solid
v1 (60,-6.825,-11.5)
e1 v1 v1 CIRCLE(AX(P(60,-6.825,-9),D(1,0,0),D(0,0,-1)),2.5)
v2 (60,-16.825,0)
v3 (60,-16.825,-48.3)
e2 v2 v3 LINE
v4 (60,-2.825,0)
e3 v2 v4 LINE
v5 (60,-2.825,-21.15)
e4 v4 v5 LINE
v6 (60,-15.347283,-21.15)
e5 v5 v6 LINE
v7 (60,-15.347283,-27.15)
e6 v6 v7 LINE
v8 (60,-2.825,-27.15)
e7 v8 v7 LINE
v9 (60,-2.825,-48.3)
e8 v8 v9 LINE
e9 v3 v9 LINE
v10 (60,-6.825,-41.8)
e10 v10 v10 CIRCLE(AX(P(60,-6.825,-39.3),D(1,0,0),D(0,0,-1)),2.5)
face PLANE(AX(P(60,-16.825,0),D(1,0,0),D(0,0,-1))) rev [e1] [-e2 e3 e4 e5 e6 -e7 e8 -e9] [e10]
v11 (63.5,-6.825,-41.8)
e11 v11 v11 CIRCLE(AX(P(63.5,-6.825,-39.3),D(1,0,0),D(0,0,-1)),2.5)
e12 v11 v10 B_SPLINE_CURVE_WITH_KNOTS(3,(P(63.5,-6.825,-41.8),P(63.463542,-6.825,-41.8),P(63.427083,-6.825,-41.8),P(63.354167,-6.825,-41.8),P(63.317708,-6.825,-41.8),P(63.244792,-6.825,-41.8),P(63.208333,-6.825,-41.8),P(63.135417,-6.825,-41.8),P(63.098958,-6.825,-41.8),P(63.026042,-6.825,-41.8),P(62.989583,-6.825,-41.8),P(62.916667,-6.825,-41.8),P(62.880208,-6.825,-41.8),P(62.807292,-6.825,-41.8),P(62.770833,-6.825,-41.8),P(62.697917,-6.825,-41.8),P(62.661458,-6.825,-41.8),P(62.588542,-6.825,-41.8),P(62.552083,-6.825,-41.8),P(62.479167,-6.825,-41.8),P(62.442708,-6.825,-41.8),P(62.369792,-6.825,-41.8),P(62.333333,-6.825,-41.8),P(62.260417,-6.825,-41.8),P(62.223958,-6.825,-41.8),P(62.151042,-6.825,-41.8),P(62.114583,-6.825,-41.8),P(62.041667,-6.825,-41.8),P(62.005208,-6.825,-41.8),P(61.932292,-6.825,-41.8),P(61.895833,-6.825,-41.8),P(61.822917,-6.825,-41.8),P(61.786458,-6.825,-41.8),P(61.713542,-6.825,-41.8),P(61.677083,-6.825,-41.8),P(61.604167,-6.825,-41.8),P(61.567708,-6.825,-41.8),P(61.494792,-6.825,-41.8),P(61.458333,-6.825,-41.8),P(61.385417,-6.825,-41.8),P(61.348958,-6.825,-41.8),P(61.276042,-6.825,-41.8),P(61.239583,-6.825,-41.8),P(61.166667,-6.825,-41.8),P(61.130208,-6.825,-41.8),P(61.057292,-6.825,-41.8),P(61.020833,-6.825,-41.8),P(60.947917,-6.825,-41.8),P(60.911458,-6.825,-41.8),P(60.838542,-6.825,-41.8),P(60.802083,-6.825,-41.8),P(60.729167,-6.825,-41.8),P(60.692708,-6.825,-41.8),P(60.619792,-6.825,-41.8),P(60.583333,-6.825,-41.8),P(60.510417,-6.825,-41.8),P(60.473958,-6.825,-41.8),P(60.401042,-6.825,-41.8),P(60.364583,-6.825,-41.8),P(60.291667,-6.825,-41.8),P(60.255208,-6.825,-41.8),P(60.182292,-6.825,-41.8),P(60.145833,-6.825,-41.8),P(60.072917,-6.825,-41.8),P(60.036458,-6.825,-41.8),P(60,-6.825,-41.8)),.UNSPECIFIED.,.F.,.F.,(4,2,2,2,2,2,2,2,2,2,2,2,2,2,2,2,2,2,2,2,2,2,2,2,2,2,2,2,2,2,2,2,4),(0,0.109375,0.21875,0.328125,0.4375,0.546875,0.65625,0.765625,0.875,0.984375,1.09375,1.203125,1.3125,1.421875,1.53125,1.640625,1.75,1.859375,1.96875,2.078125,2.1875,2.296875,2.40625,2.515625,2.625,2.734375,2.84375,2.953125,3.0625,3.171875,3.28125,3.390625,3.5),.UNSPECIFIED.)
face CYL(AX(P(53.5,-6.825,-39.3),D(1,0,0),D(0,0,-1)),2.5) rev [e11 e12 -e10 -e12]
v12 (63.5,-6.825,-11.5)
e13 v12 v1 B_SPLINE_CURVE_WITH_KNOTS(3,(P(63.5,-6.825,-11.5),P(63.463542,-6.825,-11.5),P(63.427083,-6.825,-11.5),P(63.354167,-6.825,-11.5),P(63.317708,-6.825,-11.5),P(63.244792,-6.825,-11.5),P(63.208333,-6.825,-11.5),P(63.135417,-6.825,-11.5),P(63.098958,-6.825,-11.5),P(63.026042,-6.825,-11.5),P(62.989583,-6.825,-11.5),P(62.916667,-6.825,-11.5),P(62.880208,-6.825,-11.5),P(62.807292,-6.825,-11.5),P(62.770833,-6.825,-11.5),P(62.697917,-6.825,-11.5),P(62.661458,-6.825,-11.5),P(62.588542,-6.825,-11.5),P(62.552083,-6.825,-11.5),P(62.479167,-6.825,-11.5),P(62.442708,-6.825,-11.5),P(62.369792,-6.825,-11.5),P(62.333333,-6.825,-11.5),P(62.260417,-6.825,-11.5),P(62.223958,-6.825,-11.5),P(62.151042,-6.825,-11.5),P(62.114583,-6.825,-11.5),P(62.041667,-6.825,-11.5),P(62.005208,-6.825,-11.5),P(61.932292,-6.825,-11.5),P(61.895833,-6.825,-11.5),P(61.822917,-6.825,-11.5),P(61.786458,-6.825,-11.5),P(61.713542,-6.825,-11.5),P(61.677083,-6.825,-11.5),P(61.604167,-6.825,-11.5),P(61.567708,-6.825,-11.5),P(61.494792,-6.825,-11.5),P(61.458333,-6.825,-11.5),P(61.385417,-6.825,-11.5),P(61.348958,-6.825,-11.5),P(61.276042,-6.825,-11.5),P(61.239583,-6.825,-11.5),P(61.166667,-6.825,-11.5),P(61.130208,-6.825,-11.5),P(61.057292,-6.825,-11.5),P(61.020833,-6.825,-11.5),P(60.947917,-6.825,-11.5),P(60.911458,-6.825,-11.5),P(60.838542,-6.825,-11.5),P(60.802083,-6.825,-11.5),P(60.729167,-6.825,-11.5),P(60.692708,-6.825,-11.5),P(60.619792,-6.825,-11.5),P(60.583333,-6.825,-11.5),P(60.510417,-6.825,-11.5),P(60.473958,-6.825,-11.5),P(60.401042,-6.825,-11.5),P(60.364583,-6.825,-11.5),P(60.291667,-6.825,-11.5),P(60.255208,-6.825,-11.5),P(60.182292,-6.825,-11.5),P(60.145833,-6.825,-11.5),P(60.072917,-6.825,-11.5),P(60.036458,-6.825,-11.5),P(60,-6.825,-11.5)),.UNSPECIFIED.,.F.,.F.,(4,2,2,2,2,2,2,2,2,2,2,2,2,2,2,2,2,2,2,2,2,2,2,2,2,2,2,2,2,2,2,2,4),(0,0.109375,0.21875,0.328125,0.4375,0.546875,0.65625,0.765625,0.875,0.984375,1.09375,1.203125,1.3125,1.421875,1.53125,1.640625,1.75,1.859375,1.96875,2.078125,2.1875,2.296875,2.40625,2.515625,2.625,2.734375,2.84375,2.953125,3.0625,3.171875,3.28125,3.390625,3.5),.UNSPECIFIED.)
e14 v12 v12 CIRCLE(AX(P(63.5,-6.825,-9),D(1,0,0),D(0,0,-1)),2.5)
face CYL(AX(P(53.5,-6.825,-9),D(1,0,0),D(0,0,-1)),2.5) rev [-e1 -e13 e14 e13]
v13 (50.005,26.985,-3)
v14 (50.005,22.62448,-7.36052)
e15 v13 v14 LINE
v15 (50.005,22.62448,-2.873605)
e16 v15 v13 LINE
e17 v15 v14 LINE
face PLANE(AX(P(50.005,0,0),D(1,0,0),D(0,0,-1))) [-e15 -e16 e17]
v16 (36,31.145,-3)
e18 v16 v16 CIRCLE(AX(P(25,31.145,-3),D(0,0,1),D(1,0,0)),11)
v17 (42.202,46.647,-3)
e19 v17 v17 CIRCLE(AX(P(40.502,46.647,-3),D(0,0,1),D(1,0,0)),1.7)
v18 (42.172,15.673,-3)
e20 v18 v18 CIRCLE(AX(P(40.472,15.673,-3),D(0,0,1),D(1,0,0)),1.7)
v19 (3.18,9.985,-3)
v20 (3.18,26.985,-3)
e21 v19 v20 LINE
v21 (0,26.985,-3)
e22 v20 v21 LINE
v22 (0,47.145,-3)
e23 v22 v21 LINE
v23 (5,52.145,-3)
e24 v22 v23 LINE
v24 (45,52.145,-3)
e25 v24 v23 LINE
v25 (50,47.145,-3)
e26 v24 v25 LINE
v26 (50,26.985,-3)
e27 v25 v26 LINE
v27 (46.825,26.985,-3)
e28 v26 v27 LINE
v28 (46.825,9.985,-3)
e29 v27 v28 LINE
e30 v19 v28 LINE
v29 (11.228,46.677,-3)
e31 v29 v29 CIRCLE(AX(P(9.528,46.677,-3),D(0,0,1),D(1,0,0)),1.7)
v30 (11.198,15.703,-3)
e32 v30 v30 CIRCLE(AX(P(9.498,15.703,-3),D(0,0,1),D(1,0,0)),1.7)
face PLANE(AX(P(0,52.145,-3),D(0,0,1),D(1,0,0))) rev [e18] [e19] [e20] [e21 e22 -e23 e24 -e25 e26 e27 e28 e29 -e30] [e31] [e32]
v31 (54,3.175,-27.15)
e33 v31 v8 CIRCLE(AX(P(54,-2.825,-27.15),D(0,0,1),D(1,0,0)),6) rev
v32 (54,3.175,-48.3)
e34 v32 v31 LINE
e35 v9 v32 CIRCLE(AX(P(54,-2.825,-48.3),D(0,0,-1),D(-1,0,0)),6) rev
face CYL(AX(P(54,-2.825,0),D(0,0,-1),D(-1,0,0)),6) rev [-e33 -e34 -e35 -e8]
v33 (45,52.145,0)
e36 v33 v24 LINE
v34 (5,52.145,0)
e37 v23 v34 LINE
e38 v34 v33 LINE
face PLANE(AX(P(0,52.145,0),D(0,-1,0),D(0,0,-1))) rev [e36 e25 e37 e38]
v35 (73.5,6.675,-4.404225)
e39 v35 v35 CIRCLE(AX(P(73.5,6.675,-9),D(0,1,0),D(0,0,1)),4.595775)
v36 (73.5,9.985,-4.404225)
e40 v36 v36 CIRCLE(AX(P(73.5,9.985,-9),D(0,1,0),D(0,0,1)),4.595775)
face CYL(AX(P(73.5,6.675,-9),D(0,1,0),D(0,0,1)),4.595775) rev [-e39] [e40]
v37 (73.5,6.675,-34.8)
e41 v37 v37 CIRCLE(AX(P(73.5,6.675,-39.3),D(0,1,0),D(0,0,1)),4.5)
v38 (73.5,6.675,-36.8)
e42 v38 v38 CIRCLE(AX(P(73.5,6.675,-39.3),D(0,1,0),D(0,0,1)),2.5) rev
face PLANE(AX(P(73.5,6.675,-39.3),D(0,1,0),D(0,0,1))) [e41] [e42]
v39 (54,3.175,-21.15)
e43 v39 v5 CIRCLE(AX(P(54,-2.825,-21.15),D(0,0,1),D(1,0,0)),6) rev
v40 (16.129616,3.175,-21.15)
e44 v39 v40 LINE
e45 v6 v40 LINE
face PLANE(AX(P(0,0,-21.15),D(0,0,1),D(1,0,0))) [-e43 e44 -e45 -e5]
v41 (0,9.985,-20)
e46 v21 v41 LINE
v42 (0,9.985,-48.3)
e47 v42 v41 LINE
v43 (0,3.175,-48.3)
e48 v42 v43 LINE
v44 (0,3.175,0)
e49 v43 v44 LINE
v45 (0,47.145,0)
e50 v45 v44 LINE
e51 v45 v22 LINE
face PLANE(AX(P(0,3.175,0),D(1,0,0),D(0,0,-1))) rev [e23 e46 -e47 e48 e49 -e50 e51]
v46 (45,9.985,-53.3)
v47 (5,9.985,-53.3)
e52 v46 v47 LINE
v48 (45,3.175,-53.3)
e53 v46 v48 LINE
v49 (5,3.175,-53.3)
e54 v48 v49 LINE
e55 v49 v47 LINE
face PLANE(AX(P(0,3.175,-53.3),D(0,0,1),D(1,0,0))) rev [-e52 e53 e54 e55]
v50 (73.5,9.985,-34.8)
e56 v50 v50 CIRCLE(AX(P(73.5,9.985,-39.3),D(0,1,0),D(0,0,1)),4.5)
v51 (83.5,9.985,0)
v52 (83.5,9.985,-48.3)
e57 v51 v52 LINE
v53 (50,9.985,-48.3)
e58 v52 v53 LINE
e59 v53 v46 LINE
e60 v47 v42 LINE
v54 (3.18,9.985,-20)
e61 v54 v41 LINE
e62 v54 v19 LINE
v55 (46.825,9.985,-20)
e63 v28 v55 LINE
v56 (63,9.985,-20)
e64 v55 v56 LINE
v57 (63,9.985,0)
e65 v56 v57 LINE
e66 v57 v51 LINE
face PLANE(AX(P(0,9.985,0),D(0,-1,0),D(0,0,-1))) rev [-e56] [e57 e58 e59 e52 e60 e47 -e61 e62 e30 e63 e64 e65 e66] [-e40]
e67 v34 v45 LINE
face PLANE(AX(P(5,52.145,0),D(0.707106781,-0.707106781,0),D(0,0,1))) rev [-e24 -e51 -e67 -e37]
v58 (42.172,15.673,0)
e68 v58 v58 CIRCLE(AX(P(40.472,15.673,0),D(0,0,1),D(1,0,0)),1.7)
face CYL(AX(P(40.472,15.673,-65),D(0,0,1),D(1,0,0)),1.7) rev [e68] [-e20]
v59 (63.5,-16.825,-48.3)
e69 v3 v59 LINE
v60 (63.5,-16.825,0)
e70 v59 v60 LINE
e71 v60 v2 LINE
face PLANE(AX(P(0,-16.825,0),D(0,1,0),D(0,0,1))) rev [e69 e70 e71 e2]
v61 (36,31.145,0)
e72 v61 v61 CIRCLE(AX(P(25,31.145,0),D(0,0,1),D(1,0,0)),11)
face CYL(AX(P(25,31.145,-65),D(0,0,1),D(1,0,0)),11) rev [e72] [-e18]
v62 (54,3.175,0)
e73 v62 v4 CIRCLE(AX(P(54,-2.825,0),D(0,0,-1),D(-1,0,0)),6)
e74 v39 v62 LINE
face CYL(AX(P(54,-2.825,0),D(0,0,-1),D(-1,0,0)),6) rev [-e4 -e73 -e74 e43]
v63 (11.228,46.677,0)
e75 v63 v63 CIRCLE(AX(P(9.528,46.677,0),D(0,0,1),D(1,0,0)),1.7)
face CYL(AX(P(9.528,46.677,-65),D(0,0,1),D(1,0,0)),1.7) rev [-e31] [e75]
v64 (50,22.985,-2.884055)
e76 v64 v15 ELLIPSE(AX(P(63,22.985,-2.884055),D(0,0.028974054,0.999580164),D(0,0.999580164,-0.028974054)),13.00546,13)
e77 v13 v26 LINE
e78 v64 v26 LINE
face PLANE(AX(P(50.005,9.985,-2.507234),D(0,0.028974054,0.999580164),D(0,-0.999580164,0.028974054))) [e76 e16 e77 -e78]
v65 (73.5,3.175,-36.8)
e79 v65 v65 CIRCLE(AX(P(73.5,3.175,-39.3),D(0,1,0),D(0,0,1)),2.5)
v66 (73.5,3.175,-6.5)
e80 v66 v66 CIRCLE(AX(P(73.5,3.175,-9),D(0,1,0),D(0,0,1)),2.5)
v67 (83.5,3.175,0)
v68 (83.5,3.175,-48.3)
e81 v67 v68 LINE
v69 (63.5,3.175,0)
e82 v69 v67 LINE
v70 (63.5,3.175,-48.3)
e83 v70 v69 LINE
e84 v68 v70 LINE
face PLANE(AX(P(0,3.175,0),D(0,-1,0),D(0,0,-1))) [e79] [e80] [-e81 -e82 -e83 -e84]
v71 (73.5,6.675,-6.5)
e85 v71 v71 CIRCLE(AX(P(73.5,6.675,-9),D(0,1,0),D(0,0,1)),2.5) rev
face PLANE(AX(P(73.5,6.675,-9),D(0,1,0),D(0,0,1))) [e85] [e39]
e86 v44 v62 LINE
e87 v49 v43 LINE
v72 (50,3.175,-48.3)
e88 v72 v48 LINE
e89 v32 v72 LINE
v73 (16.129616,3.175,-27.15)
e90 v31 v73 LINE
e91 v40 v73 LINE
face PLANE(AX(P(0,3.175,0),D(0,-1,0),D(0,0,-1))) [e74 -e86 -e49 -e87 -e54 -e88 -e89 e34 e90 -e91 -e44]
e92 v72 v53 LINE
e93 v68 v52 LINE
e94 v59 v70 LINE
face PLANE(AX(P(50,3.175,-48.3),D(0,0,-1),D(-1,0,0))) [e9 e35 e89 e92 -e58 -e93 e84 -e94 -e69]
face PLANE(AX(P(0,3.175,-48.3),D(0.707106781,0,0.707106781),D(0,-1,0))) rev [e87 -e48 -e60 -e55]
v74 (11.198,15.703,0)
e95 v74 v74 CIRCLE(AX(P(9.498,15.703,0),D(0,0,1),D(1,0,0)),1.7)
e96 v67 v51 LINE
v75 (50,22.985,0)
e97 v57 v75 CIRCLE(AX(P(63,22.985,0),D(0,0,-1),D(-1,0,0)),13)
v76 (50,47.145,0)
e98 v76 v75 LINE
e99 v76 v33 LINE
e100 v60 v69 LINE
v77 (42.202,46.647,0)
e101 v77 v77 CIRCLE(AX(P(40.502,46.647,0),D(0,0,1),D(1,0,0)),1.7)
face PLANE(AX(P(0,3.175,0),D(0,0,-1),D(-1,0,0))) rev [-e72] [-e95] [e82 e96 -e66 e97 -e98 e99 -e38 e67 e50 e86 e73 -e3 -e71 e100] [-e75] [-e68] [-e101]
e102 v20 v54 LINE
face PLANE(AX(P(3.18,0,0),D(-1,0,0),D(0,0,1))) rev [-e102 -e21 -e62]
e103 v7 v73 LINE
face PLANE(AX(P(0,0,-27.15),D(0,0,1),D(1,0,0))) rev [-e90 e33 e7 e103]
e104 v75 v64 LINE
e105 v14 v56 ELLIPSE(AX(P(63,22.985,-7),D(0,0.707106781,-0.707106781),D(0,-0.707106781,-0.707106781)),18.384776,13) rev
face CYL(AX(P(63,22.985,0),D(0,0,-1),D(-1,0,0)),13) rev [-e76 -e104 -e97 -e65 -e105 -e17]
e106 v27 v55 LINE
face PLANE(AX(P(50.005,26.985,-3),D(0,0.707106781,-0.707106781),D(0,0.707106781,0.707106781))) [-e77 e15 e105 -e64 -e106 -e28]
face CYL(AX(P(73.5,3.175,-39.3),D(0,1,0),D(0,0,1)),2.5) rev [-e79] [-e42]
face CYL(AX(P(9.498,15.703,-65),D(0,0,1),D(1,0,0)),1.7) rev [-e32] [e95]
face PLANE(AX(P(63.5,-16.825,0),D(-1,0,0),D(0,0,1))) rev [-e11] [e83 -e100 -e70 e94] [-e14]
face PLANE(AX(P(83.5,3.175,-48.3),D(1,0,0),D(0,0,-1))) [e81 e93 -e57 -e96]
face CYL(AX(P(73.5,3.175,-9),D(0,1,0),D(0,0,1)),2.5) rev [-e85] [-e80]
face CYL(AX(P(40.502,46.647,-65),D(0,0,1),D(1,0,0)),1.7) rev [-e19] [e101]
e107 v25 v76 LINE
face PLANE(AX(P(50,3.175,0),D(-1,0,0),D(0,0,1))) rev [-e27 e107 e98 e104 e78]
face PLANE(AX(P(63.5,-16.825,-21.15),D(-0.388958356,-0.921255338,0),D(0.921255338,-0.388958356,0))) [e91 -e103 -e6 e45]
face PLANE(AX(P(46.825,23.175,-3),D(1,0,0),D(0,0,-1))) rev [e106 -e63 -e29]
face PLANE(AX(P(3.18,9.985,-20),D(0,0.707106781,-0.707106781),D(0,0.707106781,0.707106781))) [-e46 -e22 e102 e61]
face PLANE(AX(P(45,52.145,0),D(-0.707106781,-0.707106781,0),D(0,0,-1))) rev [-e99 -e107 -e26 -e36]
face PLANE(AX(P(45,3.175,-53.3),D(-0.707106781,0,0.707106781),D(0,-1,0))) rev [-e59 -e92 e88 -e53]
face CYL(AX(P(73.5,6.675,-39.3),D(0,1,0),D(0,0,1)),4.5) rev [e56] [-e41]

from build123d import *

# Parameters (mm, degrees)
SKETCH1_W               = 50
SKETCH1_H               = 53.3
BOSS_EXTRUDE1_DEPTH     = 3.175
SKETCH2_W               = 50
SKETCH2_H               = 3
BOSS_EXTRUDE2_DEPTH     = 48.97
SKETCH3_W               = 3.175
SKETCH3_H               = 15
SKETCH3_H_2             = 15.175
BOSS_EXTRUDE3_DEPTH     = 20
CUT_EXTRUDE1_DEPTH      = 65
SKETCH5_R               = 11
SKETCH5_R_2             = 1.7
CUT_EXTRUDE2_DEPTH      = 65
CUT_EXTRUDE3_DEPTH      = 65
CHAMFER1_SIZE           = 5
FILLET1_R               = 5
BOSS_EXTRU_1_DEPTH      = 6.81
ENL_V_MAT_EXTRU_1_DEPTH = 6.81
BOSS_EXTRU_2_DEPTH      = 3.18
BOSS_EXTRU_3_DEPTH      = 3.18
ESQUISSE5_W             = 13.5
ESQUISSE5_H             = 48.3
BOSS_EXTRU_4_DEPTH      = 6.81
ESQUISSE6_W             = 20
ESQUISSE6_H             = 48.3
ESQUISSE6_R             = 2.5
BOSS_EXTRU_5_DEPTH      = 6.81
ESQUISSE7_W             = 3.5
ESQUISSE7_H             = 48.3
BOSS_EXTRU_6_DEPTH      = 20
ESQUISSE8_R             = 2.5
ENL_V_MAT_EXTRU_2_DEPTH = 10
ESQUISSE9_R             = 4.5
ESQUISSE9_R_2           = 4.595775112
ENL_V_MAT_EXTRU_3_DEPTH = 3.31
CONG_1_R                = 6
CONG_2_R                = 13
BOSS_EXTRU_7_DEPTH      = 3
BOSS_EXTRU_7_DEPTH_BACK = 3


with BuildPart() as part:
    # Sketch1 → Boss-Extrude1 (new body)
    with BuildSketch(Plane(origin=(0, 0, 0), x_dir=(1, 0, 0), z_dir=(0, 1, 0))):
        with Locations((25, 26.65)):
            Rectangle(SKETCH1_W, SKETCH1_H)
    extrude(amount=BOSS_EXTRUDE1_DEPTH)

    # Sketch2 → Boss-Extrude2 (add)
    with BuildSketch(Plane(origin=(0, 3.175, 0), x_dir=(1, 0, 0), z_dir=(0, 1, 0))):
        with Locations((25, 1.5)):
            Rectangle(SKETCH2_W, SKETCH2_H)
    extrude(amount=BOSS_EXTRUDE2_DEPTH)

    # Sketch3 → Boss-Extrude3 (add)
    with BuildSketch(Plane(origin=(0, 3.175, 0), x_dir=(1, 0, 0), z_dir=(0, 1, 0))):
        with Locations((1.5875, 10.5)):
            Rectangle(SKETCH3_W, SKETCH3_H)
        with Locations((48.4125, 10.5875)):
            Rectangle(SKETCH3_W, SKETCH3_H_2)
    extrude(amount=BOSS_EXTRUDE3_DEPTH)

    # Sketch4 → Cut-Extrude1 (cut)
    with BuildSketch(Plane(origin=(50, 0, 0), x_dir=(0, 0, -1), z_dir=(1, 0, 0))):
        Polygon((18.175, 3.175), (3, 23.175), (18.175, 23.175), align=None)
    extrude(amount=-CUT_EXTRUDE1_DEPTH, mode=Mode.SUBTRACT)

    # Sketch5 → Cut-Extrude2 (cut)
    with BuildSketch(Plane.XY):
        with Locations((25, 31.145)):
            Circle(SKETCH5_R)
        with Locations((40.502, 46.647)):
            Circle(SKETCH5_R_2)
        with Locations((9.528, 46.677)):
            Circle(SKETCH5_R_2)
        with Locations((9.498, 15.703)):
            Circle(SKETCH5_R_2)
        with Locations((40.472, 15.673)):
            Circle(SKETCH5_R_2)
    extrude(amount=-CUT_EXTRUDE2_DEPTH, mode=Mode.SUBTRACT)

    # Sketch6 → Cut-Extrude3 (cut)
    with BuildSketch(Plane(origin=(0, 3.175, 0), x_dir=(1, 0, 0), z_dir=(0, 1, 0))):
        with BuildLine():
            ThreePointArc((42.125, 42.3), (40, 44.425), (37.875, 42.3))
            Line((37.875, 42.3), (37.875, 12.3))
            ThreePointArc((37.875, 12.3), (40, 10.175), (42.125, 12.3))
            Line((42.125, 12.3), (42.125, 42.3))
        make_face()
        with BuildLine():
            Line((7.875, 42.3), (7.875, 12.3))
            ThreePointArc((7.875, 12.3), (10, 10.175), (12.125, 12.3))
            Line((12.125, 12.3), (12.125, 42.3))
            ThreePointArc((12.125, 42.3), (10, 44.425), (7.875, 42.3))
        make_face()
    extrude(amount=-CUT_EXTRUDE3_DEPTH, mode=Mode.SUBTRACT)

    # Chamfer1
    chamfer1_edges = [part.edges().sort_by_distance(p)[0] for p in [
        (0, 1.5875, -53.3),
        (50, 1.5875, -53.3),
        (0, 52.145, -1.5),
        (50, 52.145, -1.5),
    ]]
    chamfer(chamfer1_edges, length=CHAMFER1_SIZE)

    # Fillet1
    fillet1_edges = [part.edges().sort_by_distance(p)[0] for p in [
        (25, 3.175, -3),
        (25, 0, 0),
    ]]
    fillet(fillet1_edges, radius=FILLET1_R)

    # Esquisse2 → Boss.-Extru.1 (add)
    with BuildSketch(Plane(origin=(0, 3.175, 0), x_dir=(1, 0, 0), z_dir=(0, 1, 0))):
        Polygon((0, 48.3), (5, 53.3), (45, 53.3), (50, 48.3), (50, 0), (0, 0), align=None)
    extrude(amount=BOSS_EXTRU_1_DEPTH)

    # Esquisse2<2> → Enlèv. mat.-Extru.1 (cut)
    with BuildSketch(Plane(origin=(0, 3.175, 0), x_dir=(1, 0, 0), z_dir=(0, 1, 0))):
        Polygon((0, 48.3), (5, 53.3), (45, 53.3), (50, 48.3), (50, 0), (0, 0), align=None)
    extrude(amount=-ENL_V_MAT_EXTRU_1_DEPTH, mode=Mode.SUBTRACT)

    # Esquisse3 → Boss.-Extru.2 (add)
    with BuildSketch(Plane.ZY):
        Polygon((-20, 9.985), (-3, 26.985), (-3, 9.985), align=None)
    extrude(amount=-BOSS_EXTRU_2_DEPTH)

    # Esquisse4 → Boss.-Extru.3 (add)
    with BuildSketch(Plane.ZY.offset(-46.825)):
        Polygon((-20, 9.985), (-2.507234201, 9.985), (-3, 26.985), align=None)
    extrude(amount=-BOSS_EXTRU_3_DEPTH)

    # Esquisse5 → Boss.-Extru.4 (add)
    with BuildSketch(Plane(origin=(0, 9.985, 0), x_dir=(1, 0, 0), z_dir=(0, 1, 0))):
        with Locations((56.75, 24.15)):
            Rectangle(ESQUISSE5_W, ESQUISSE5_H)
    extrude(amount=-BOSS_EXTRU_4_DEPTH)

    # Esquisse6 → Boss.-Extru.5 (add)
    with BuildSketch(Plane(origin=(0, 9.985, 0), x_dir=(1, 0, 0), z_dir=(0, 1, 0))):
        with Locations((73.5, 24.15)):
            Rectangle(ESQUISSE6_W, ESQUISSE6_H)
        with Locations(Location((73.5, 39.3, 0), (0, 0, 270))):
            Circle(ESQUISSE6_R, mode=Mode.SUBTRACT)
        with Locations(Location((73.5, 9, 0), (0, 0, 270))):
            Circle(ESQUISSE6_R, mode=Mode.SUBTRACT)
    extrude(amount=-BOSS_EXTRU_5_DEPTH)

    # Esquisse7 → Boss.-Extru.6 (add)
    with BuildSketch(Plane(origin=(0, 3.175, 0), x_dir=(-1, 0, 0), z_dir=(0, -1, 0))):
        with Locations((-61.75, 24.15)):
            Rectangle(ESQUISSE7_W, ESQUISSE7_H)
    extrude(amount=BOSS_EXTRU_6_DEPTH)

    # Esquisse8 → Enlèv. mat.-Extru.2 (cut)
    with BuildSketch(Plane(origin=(63.5, 0, 0), x_dir=(0, 0, -1), z_dir=(1, 0, 0))):
        with Locations((9, -6.825)):
            Circle(ESQUISSE8_R)
        with Locations((39.3, -6.825)):
            Circle(ESQUISSE8_R)
    extrude(amount=-ENL_V_MAT_EXTRU_2_DEPTH, mode=Mode.SUBTRACT)

    # Esquisse9 → Enlèv. mat.-Extru.3 (cut)
    with BuildSketch(Plane(origin=(0, 9.985, 0), x_dir=(1, 0, 0), z_dir=(0, 1, 0))):
        with Locations(Location((73.5, 39.3, 0), (0, 0, 270))):
            Circle(ESQUISSE9_R)
        with Locations(Location((73.5, 9, 0), (0, 0, 270))):
            Circle(ESQUISSE9_R_2)
    extrude(amount=-ENL_V_MAT_EXTRU_3_DEPTH, mode=Mode.SUBTRACT)

    # Congé1
    cong_1_edges = [part.edges().sort_by_distance(p)[0] for p in [
        (60, 3.175, -24.15),
    ]]
    fillet(cong_1_edges, radius=CONG_1_R)

    # Congé2
    # the kernel refuses this fillet: 13 mm, written as the material it adds along each edge
    with BuildSketch(Plane(origin=(50, 9.985, 0), x_dir=(1, 0, 0), z_dir=(0, 0, -1))) as cong_2_piece_1_section:
        with BuildLine():
            CenterArc((CONG_2_R, -CONG_2_R), CONG_2_R, 90, 90)
            Line((0, -CONG_2_R), (0, 0))
            Line((0, 0), (CONG_2_R, 0))
        make_face()
    cong_2_piece_1 = extrude(amount=35.007234201, mode=Mode.PRIVATE)
    cong_2_piece_1 = split(cong_2_piece_1, bisect_by=Plane(origin=(52.869924632, 20.818582146, -9.166417854), z_dir=(0, -0.7071067811865461, 0.707106781186549)), keep=Keep.TOP, mode=Mode.PRIVATE)
    add(cong_2_piece_1)

    # Esquisse11 → Boss.-Extru.7 (add, two sides: drawn at the far end of the back side and taken through both)
    with BuildSketch(Plane(origin=(0, 0, -24.15), x_dir=(-1, 0, 0), z_dir=(0, 0, -1)).offset(-BOSS_EXTRU_7_DEPTH_BACK)):
        Polygon((-63.5, -16.825), (0, 9.985), (-63.5, 9.985), align=None)
    extrude(amount=BOSS_EXTRU_7_DEPTH + BOSS_EXTRU_7_DEPTH_BACK)


solid = part.part
